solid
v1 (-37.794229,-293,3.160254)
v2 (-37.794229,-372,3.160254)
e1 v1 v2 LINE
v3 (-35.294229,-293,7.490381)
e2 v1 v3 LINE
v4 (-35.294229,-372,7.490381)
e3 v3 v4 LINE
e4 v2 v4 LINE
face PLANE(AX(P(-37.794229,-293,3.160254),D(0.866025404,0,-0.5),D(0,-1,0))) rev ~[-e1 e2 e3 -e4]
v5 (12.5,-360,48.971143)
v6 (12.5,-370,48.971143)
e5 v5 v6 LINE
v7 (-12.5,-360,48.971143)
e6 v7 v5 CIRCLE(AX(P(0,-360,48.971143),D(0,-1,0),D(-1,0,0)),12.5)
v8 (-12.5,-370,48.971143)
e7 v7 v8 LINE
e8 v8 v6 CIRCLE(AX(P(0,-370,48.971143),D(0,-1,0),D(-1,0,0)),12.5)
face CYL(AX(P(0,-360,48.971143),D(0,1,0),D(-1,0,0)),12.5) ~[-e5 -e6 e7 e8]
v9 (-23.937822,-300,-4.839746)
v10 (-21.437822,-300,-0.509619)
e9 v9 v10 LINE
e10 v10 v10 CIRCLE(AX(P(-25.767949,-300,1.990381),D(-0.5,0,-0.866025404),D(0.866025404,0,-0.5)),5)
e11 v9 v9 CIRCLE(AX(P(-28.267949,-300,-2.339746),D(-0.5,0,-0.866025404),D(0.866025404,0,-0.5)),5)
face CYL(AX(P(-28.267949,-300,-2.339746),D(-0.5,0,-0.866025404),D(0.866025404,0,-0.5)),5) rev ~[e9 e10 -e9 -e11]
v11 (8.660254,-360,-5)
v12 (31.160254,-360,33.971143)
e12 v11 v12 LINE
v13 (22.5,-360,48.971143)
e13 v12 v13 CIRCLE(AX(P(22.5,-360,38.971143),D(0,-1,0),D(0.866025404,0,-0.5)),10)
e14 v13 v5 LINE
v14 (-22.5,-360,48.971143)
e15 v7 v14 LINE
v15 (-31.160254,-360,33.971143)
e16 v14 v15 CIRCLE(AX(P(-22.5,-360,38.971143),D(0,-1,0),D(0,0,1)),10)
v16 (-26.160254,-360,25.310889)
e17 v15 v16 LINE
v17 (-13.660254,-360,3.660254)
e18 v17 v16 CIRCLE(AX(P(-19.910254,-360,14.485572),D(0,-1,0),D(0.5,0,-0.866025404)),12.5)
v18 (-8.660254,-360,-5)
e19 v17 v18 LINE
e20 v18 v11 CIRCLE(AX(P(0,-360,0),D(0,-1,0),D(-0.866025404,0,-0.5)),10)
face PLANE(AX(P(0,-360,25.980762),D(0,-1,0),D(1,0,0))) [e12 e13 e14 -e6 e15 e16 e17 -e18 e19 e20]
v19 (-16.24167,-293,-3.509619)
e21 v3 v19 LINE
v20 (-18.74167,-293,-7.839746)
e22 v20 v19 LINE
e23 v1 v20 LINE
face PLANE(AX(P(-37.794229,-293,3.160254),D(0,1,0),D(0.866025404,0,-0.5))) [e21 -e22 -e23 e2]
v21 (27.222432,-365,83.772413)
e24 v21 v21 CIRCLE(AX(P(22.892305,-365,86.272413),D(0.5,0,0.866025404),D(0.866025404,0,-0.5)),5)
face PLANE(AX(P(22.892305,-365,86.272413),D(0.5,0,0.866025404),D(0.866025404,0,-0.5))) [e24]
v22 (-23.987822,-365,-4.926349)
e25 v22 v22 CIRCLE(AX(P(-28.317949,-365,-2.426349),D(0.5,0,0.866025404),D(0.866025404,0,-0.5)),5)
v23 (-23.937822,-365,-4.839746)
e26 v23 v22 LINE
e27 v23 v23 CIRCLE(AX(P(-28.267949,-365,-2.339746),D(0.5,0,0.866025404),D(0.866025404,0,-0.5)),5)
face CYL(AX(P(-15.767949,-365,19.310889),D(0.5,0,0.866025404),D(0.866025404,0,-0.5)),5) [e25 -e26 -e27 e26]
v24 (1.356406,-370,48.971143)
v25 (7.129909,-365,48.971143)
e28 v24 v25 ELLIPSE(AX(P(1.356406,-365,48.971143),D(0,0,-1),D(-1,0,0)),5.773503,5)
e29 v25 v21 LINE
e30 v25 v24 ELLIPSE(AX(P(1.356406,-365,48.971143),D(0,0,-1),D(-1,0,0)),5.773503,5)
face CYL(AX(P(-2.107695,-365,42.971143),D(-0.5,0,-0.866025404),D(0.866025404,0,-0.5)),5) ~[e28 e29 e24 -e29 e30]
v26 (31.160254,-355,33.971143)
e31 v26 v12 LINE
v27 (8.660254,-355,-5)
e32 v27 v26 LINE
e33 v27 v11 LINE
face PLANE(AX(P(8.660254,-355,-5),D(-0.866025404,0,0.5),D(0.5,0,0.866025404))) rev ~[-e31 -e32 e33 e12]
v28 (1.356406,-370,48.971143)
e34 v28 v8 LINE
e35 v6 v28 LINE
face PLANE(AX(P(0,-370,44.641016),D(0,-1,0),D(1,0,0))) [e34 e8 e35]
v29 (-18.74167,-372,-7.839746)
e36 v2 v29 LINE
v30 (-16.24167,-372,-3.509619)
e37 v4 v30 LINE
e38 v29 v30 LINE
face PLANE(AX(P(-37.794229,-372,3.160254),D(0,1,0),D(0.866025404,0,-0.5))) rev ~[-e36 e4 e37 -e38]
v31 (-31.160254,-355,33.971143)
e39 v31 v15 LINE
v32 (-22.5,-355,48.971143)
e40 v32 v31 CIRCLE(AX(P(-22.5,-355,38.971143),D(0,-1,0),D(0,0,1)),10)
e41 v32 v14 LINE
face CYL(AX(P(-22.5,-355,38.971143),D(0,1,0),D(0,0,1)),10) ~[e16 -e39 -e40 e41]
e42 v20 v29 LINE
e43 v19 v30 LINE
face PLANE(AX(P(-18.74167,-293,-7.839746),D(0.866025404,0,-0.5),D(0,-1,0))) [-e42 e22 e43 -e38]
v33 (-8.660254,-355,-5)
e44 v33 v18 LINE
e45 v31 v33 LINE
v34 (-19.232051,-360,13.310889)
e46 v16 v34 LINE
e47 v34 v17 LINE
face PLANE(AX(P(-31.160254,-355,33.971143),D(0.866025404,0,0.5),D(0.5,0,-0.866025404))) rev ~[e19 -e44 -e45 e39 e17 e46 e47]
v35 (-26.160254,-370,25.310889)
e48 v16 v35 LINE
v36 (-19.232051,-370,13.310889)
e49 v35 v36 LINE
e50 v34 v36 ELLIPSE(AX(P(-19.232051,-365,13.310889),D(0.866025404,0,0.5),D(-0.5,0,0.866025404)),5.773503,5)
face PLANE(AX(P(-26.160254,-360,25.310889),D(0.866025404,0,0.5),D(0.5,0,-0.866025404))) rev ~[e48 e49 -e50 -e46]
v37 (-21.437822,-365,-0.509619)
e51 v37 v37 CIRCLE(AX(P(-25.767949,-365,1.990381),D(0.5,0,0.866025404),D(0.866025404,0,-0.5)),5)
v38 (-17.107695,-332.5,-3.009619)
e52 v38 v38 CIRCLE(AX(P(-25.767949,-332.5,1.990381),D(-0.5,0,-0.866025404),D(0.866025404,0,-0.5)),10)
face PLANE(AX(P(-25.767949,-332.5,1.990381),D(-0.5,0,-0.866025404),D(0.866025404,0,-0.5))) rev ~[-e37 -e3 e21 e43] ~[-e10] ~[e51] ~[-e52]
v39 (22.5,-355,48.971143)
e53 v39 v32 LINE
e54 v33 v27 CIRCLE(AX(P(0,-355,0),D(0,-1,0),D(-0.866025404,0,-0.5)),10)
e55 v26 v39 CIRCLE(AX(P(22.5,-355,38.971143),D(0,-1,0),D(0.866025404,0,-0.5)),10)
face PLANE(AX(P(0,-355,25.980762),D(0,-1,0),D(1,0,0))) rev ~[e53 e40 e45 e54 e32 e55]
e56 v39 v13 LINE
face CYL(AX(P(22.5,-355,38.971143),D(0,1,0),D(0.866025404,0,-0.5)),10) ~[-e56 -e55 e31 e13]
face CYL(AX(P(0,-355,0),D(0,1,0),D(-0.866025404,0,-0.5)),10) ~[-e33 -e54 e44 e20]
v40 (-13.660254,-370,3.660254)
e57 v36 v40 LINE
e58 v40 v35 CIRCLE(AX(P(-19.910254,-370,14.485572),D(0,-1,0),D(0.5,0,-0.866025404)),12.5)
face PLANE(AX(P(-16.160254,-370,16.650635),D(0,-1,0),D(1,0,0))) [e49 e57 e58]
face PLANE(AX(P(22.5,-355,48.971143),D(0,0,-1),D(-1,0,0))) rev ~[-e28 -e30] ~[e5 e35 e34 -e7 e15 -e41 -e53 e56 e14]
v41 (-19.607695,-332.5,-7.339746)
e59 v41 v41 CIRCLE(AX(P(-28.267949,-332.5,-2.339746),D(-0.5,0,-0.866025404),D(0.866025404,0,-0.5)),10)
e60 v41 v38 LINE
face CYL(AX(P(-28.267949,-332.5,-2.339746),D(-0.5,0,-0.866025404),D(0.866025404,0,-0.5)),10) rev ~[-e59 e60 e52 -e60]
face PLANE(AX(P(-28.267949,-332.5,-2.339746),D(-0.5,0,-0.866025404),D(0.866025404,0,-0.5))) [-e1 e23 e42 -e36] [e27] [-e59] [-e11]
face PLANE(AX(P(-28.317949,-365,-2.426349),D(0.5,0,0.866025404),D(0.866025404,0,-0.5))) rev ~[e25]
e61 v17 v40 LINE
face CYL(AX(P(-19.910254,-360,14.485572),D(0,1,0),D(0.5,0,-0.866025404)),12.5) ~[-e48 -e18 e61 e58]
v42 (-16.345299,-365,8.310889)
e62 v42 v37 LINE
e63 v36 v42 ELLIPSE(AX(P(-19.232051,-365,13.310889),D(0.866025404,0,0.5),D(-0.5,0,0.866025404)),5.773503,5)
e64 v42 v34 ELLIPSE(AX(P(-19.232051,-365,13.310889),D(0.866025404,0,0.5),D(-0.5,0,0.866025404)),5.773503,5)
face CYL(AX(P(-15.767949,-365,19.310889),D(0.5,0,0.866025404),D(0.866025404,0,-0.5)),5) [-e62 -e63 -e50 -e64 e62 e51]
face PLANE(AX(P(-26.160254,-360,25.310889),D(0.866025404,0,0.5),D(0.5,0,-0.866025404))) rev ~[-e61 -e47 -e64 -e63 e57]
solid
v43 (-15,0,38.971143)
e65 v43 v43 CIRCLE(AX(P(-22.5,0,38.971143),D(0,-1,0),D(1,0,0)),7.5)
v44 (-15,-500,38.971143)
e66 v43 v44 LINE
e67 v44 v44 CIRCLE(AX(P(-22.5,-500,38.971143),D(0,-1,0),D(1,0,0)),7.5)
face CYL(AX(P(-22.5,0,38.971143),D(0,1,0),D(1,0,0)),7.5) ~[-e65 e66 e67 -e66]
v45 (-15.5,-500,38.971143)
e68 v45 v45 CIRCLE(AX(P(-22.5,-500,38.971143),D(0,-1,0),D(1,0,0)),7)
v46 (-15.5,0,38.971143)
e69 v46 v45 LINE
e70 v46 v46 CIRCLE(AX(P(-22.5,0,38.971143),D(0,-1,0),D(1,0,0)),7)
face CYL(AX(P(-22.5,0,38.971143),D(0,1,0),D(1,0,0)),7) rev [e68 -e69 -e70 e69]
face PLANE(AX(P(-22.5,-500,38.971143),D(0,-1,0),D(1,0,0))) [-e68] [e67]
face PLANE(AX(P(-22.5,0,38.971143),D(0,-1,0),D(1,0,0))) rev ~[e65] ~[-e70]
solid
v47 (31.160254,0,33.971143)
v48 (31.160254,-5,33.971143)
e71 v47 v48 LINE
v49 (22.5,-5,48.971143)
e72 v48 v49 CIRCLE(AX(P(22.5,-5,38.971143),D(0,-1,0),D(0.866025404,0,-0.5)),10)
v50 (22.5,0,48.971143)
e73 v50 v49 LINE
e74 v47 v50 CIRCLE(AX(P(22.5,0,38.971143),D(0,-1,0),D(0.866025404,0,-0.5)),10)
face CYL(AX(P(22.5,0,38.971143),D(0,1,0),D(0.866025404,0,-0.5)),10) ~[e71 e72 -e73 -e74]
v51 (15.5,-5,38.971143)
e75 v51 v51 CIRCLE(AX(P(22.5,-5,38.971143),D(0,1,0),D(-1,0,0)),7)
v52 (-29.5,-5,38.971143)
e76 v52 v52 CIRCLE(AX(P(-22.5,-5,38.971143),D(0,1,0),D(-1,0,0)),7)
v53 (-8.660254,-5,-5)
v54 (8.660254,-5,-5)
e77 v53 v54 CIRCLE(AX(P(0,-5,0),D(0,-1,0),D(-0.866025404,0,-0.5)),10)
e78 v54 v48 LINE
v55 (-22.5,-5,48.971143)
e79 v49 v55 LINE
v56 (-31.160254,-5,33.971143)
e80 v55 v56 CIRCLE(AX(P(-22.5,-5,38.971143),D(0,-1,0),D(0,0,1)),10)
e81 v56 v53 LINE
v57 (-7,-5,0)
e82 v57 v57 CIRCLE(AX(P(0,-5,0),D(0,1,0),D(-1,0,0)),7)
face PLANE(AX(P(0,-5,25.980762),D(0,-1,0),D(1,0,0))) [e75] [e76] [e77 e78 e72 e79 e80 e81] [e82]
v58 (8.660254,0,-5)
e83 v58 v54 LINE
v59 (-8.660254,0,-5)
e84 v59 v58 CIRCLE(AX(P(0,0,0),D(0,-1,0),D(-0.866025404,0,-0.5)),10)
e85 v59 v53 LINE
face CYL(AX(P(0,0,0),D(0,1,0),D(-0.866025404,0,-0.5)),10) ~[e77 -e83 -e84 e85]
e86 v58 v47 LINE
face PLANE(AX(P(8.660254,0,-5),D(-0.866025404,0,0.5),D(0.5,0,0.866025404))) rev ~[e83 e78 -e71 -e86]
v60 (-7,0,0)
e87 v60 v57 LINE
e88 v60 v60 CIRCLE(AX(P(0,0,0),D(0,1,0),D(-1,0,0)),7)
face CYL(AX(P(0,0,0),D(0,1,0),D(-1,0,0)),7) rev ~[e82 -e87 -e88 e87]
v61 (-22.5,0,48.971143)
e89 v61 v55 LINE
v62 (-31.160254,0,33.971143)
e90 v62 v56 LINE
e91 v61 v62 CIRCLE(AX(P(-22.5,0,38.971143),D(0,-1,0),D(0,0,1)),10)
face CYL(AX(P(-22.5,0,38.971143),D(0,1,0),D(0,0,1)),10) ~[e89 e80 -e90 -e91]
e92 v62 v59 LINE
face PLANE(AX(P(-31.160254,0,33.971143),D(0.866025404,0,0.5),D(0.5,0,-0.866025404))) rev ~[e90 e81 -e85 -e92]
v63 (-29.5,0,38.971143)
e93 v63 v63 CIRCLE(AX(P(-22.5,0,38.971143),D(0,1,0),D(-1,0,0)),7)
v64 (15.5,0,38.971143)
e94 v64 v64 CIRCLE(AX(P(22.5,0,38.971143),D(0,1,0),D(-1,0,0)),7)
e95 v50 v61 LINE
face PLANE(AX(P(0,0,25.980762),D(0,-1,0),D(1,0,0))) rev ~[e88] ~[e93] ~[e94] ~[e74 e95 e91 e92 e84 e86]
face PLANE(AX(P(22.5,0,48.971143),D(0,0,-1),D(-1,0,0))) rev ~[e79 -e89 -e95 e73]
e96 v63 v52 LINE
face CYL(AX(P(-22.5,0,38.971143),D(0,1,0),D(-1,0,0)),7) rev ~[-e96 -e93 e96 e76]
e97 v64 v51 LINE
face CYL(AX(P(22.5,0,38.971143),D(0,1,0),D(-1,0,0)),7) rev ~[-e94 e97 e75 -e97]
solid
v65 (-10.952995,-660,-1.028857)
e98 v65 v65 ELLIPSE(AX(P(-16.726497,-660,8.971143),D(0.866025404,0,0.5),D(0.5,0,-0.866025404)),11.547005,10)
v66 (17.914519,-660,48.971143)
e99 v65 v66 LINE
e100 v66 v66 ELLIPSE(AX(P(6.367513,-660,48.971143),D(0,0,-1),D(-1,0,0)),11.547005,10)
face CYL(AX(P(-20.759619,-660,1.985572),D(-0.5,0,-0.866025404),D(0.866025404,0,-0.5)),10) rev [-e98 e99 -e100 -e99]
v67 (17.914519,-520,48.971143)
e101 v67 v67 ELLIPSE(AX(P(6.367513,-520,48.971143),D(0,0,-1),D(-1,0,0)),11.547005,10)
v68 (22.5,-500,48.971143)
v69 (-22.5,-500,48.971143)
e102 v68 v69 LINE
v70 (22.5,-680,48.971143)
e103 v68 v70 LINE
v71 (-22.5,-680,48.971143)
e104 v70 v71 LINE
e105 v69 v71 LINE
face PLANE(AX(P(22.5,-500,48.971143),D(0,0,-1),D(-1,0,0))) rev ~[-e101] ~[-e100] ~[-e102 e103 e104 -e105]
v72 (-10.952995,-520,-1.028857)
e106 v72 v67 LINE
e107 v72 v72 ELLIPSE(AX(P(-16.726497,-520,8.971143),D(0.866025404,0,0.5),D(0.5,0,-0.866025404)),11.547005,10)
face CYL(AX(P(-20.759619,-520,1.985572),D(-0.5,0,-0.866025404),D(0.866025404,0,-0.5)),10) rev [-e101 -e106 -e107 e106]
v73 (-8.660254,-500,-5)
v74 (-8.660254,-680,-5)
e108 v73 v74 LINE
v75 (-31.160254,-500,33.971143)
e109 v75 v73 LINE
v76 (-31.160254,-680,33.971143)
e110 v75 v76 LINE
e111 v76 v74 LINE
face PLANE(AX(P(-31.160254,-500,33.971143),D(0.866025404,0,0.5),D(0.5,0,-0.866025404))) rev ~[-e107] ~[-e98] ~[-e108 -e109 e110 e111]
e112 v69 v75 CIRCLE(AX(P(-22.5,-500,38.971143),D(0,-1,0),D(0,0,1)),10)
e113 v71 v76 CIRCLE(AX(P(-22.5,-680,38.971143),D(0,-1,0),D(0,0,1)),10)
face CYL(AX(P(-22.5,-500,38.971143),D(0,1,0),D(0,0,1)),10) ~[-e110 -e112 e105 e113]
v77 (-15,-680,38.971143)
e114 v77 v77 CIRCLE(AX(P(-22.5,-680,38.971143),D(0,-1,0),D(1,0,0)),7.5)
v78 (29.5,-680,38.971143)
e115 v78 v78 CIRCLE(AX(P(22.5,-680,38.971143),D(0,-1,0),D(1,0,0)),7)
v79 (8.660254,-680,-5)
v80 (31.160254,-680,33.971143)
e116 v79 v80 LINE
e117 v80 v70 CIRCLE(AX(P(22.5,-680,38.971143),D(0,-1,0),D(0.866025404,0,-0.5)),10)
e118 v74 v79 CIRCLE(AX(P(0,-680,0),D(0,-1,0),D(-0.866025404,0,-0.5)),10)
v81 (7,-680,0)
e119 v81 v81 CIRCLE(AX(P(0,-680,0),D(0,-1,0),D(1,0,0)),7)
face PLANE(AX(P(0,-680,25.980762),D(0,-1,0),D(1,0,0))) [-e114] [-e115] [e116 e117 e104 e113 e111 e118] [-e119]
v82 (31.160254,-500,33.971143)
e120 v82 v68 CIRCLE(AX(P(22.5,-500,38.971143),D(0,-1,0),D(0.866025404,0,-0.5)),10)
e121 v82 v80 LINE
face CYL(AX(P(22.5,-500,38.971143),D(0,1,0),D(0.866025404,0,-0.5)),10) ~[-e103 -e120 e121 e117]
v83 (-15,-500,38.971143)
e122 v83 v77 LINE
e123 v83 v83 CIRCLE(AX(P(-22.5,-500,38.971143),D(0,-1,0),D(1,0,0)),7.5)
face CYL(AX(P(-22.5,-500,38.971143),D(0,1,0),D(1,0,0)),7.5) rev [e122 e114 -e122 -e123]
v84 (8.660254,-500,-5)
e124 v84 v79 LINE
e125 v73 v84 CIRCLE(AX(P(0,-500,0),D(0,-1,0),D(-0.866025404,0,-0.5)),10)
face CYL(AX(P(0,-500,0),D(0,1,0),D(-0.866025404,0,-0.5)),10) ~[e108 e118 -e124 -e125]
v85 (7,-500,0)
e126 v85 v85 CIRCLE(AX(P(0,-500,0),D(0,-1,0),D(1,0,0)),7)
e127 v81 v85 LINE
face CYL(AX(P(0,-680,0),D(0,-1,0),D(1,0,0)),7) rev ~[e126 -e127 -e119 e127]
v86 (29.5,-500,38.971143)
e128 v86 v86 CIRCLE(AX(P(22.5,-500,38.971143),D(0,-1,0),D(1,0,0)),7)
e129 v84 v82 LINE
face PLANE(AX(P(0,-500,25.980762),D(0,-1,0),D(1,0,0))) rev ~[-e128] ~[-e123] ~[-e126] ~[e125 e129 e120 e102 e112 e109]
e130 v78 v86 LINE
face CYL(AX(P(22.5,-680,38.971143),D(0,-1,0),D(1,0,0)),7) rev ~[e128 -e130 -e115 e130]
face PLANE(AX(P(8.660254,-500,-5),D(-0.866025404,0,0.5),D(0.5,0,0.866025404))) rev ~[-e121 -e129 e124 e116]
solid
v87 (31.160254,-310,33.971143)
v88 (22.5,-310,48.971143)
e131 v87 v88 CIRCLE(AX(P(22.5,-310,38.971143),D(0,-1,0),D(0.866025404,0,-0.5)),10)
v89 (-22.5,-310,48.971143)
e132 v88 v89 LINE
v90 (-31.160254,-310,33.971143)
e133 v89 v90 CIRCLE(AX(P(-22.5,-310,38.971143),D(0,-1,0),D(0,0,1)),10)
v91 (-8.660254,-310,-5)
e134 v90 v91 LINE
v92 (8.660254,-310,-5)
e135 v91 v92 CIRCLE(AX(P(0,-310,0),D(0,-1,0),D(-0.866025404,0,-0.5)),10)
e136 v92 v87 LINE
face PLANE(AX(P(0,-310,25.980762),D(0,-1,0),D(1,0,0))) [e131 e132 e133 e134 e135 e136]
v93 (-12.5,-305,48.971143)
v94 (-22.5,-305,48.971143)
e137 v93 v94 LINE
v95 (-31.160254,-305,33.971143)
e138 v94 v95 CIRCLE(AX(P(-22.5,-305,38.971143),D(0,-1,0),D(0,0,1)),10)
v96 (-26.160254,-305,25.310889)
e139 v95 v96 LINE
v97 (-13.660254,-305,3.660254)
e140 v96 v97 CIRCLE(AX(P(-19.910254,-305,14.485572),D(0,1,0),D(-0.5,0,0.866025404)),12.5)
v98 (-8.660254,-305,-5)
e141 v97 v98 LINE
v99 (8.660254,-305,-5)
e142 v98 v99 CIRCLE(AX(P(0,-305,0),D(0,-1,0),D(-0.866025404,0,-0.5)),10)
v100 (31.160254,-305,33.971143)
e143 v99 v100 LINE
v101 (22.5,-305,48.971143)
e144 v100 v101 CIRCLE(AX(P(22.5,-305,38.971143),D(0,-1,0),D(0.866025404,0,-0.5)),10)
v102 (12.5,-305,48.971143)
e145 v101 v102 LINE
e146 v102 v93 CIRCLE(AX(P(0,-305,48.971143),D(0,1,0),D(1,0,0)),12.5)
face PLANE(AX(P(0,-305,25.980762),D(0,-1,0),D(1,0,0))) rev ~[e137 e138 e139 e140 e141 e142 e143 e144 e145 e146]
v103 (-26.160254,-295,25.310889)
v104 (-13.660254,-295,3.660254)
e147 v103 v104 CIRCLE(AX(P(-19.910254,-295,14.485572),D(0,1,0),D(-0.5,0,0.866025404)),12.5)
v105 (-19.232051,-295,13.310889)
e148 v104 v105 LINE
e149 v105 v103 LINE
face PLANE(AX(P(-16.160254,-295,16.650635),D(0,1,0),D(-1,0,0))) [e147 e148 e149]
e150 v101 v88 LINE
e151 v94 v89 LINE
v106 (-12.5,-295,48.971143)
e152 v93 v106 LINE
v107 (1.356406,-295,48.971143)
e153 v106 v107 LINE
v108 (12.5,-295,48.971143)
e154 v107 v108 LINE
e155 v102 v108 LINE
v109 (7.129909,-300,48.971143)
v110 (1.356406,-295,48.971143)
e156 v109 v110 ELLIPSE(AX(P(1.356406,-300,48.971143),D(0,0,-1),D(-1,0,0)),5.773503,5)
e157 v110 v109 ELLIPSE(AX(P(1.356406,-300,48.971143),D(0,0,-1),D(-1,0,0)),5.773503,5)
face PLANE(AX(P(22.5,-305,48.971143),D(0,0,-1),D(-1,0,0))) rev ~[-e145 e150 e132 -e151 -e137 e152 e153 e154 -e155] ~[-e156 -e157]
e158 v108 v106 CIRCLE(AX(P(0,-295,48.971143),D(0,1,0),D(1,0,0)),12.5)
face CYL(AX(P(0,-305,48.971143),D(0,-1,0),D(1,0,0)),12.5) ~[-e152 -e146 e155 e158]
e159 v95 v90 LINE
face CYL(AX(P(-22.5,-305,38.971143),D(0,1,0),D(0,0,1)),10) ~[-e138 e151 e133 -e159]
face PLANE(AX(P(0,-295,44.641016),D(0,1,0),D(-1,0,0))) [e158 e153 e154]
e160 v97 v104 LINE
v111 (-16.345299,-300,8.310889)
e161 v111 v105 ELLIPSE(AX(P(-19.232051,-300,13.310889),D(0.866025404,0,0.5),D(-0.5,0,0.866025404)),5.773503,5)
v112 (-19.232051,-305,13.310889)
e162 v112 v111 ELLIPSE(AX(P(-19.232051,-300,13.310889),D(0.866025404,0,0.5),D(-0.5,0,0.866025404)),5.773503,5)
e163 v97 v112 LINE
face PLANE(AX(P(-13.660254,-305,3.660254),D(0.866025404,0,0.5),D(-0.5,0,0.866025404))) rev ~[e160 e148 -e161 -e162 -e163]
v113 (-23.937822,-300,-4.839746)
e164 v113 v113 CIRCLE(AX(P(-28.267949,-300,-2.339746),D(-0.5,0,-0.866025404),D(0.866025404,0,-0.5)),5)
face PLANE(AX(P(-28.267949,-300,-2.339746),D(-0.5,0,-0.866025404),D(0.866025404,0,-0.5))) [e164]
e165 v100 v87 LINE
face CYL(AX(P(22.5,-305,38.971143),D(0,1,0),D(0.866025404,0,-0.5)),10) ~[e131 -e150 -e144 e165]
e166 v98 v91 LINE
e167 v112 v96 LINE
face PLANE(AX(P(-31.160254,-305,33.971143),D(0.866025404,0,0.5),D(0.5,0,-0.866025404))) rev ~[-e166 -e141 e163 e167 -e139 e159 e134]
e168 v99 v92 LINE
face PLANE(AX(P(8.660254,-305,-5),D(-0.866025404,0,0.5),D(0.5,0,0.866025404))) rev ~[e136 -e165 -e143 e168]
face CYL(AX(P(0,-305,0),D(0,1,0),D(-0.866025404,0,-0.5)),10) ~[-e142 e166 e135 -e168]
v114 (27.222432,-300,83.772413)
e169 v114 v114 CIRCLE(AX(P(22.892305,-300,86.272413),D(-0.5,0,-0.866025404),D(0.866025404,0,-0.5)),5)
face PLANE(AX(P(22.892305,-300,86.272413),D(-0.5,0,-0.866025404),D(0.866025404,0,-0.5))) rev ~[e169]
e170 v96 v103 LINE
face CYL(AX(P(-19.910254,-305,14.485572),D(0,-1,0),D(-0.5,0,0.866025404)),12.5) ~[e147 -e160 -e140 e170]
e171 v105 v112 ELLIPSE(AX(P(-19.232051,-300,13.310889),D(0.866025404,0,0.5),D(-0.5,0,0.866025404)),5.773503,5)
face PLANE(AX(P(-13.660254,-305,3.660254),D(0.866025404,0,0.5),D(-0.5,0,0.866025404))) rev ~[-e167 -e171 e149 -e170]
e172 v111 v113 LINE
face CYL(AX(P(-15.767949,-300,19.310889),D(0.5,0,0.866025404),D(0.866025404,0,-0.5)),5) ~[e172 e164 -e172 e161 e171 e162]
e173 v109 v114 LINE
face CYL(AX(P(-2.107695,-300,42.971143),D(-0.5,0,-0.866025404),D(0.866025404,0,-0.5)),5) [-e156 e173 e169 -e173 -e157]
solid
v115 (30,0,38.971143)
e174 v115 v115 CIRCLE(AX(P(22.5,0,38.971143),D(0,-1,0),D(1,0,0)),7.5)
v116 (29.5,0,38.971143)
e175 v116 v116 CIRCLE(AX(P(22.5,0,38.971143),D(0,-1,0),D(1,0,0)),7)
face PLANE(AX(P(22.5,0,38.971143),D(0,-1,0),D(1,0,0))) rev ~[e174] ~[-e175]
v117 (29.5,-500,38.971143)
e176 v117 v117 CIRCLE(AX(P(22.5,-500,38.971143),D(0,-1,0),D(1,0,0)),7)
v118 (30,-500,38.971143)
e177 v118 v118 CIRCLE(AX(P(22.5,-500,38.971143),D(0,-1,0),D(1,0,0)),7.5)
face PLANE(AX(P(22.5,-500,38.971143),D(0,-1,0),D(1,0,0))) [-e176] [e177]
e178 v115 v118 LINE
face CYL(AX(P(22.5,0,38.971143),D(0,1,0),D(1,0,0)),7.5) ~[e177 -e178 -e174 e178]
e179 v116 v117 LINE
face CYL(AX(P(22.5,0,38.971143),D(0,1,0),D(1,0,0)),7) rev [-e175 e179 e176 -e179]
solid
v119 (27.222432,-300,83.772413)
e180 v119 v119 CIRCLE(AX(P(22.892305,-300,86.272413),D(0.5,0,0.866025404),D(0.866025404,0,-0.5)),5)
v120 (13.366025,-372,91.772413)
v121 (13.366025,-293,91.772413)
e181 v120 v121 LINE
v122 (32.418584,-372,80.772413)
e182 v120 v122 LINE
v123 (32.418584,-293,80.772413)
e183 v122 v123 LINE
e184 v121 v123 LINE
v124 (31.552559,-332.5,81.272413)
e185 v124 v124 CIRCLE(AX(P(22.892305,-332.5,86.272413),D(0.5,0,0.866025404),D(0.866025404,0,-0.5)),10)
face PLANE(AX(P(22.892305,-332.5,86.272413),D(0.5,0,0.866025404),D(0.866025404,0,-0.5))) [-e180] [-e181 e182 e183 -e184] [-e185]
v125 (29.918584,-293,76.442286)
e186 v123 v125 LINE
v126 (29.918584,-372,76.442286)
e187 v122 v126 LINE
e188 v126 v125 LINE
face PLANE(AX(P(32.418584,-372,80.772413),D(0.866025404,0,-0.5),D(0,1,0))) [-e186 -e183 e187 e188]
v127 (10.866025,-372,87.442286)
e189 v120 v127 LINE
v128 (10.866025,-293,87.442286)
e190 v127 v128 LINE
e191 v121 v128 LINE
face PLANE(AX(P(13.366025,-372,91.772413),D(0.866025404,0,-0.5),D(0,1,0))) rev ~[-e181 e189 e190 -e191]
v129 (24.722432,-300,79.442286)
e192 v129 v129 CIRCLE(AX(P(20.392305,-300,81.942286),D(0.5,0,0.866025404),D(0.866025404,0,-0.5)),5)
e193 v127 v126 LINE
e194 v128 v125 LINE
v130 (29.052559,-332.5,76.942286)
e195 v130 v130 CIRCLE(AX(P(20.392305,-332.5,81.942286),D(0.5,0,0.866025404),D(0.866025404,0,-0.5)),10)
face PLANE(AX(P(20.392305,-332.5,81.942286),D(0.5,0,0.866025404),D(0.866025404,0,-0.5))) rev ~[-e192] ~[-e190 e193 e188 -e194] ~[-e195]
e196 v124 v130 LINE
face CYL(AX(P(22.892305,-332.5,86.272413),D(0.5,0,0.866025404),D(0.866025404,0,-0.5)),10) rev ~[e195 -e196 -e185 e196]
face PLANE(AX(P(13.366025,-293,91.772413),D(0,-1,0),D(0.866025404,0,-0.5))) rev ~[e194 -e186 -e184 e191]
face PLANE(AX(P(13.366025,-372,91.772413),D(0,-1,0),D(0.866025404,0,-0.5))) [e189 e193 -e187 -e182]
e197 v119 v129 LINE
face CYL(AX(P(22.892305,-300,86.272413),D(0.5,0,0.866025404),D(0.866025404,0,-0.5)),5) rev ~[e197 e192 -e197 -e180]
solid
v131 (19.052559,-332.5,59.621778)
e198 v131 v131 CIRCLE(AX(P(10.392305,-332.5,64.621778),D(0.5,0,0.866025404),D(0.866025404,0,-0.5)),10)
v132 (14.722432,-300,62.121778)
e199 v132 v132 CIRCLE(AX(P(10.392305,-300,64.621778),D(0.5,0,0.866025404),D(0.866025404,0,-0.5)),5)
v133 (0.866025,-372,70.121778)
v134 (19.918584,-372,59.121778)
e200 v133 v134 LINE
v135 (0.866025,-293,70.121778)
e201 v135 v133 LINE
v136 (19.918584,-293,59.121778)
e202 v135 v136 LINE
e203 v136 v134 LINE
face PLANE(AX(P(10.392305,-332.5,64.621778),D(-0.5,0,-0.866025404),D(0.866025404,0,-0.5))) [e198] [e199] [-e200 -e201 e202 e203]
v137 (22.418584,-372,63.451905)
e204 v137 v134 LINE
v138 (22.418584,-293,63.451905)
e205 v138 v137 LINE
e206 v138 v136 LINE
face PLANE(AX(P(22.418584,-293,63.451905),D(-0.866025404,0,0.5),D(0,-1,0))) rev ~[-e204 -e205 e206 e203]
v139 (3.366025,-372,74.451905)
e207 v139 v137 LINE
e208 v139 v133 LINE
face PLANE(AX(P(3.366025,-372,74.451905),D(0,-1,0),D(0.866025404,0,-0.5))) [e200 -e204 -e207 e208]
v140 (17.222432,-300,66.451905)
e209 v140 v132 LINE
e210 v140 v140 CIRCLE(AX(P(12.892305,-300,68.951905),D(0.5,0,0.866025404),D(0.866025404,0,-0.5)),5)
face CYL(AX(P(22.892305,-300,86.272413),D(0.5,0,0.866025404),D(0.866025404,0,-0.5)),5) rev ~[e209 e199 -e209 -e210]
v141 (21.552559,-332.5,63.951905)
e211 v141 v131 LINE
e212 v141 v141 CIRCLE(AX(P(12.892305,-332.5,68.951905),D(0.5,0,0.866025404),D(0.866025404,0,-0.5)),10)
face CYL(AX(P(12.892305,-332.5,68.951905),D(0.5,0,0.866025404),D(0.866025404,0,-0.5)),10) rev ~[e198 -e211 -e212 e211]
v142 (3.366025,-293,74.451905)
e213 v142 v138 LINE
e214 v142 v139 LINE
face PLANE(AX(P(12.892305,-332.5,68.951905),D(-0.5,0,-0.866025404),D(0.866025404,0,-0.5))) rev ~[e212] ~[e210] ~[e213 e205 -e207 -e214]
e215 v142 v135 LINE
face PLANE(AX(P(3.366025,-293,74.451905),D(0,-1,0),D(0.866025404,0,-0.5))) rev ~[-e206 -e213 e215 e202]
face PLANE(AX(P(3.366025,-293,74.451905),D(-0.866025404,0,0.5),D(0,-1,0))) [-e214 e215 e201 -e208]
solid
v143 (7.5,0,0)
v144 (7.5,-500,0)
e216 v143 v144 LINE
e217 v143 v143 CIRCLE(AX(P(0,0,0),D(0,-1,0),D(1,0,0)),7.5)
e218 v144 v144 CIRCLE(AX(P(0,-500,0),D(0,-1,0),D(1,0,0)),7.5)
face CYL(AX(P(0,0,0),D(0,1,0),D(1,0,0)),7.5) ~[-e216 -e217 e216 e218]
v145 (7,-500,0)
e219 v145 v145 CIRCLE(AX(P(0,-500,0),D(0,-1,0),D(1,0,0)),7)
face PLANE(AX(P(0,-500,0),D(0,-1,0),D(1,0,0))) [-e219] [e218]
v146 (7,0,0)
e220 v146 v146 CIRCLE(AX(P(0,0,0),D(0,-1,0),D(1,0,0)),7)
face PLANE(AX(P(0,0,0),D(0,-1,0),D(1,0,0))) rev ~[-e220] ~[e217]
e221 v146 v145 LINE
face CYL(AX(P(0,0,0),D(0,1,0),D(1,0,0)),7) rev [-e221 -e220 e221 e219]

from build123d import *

# Parameters (mm, degrees)
F0_R      = 7.5
F0_R_2    = 7
F1_DEPTH  = 500
F3_DEPTH  = 5
F4_R      = 7.5
F5_DEPTH  = 180
F8_R      = 7
F9_DEPTH  = 25
F11_R     = 7
F12_DEPTH = 195.3
F15_DEPTH = 5
F18_DEPTH = 5
F20_DEPTH = 10
F22_DEPTH = 10
F24_R     = 5
F25_DEPTH = 50
F27_R     = 5
F28_DEPTH = 50
F29_W     = 22
F29_H     = 79
F30_DEPTH = 5
F31_R     = 10
F32_DEPTH = 28.9
F34_W     = 22
F34_H     = 79
F35_DEPTH = 5
F36_R     = 10
F37_DEPTH = 14.6
F39_DEPTH = 10
F41_DEPTH = 10
F44_R     = 5
F45_DEPTH = 25
F46_R     = 5
F47_DEPTH = 25.1
F48_W     = 22
F48_H     = 79
F48_R     = 5
F49_DEPTH = 5
F50_R     = 10
F51_DEPTH = 25
F52_R     = 5
F53_DEPTH = 25
F7_R      = 10
F56_DEPTH = 101


# Not quite as in the source:
# - a feature of the source that left no trace in its solid (it failed there, or was rolled back) is left out


with BuildPart() as f1:
    # F0 (on Front) → F1 (new body)
    with BuildSketch(Plane.XZ):
        with Locations((-22.5, 38.9711431703)):
            Circle(F0_R)
        with Locations((-22.5, 38.9711431703)):
            Circle(F0_R_2, mode=Mode.SUBTRACT)
    extrude(amount=F1_DEPTH)


with BuildPart() as f1b:
    # F0 (on Front) → F1, piece 2 (new body)
    with BuildSketch(Plane.XZ):
        with Locations((22.5, 38.9711431703)):
            Circle(F0_R)
        with Locations((22.5, 38.9711431703)):
            Circle(F0_R_2, mode=Mode.SUBTRACT)
    extrude(amount=F1_DEPTH)


with BuildPart() as f1c:
    # F0 (on Front) → F1, piece 3 (new body)
    with BuildSketch(Plane.XZ):
        Circle(F0_R)
        Circle(F0_R_2, mode=Mode.SUBTRACT)
    extrude(amount=F1_DEPTH)


with BuildPart() as f3:
    # F2 (on Front) → F3 (new body)
    with BuildSketch(Plane.XZ):
        with BuildLine():
            ThreePointArc((31.1602540378, 33.9711431703), (31.1602540378, 43.9711431703), (22.5, 48.9711431703))
            Line((22.5, 48.9711431703), (-22.5, 48.9711431703))
            ThreePointArc((-22.5, 48.9711431703), (-31.1602540378, 43.9711431703), (-31.1602540378, 33.9711431703))
            Line((-31.1602540378, 33.9711431703), (-8.6602540378, -5))
            ThreePointArc((-8.6602540378, -5), (0, -10), (8.6602540378, -5))
            Line((8.6602540378, -5), (31.1602540378, 33.9711431703))
        make_face()
    extrude(amount=F3_DEPTH)

    # F8 (on face) → F9 (cut)
    with BuildSketch(Plane(origin=(0, 0, 0), x_dir=(-1, 0, 0), z_dir=(0, 1, 0))):
        with Locations((-22.5, 38.9711431703)):
            Circle(F8_R)
        with Locations((22.5, 38.9711431703)):
            Circle(F8_R)
        Circle(F8_R)
    extrude(amount=-F9_DEPTH, mode=Mode.SUBTRACT)


with BuildPart() as f5:
    # F4 (on face) → F5 (new body)
    with BuildSketch(Plane.XZ.offset(500)):
        with BuildLine():
            Line((22.5, 48.9711431703), (-22.5, 48.9711431703))
            ThreePointArc((-22.5, 48.9711431703), (-31.1602540378, 43.9711431703), (-31.1602540378, 33.9711431703))
            Line((-31.1602540378, 33.9711431703), (-8.6602540378, -5))
            ThreePointArc((-8.6602540378, -5), (0, -10), (8.6602540378, -5))
            Line((8.6602540378, -5), (31.1602540378, 33.9711431703))
            ThreePointArc((31.1602540378, 33.9711431703), (31.1602540378, 43.9711431703), (22.5, 48.9711431703))
        make_face()
        with Locations((-22.5, 38.9711431703)):
            Circle(F4_R, mode=Mode.SUBTRACT)
    extrude(amount=F5_DEPTH)

    # F11 (on face) → F12 (cut)
    with BuildSketch(Plane.XZ.offset(680)):
        with Locations((22.5, 38.9711431703)):
            Circle(F11_R)
        Circle(F11_R)
        with Locations((-22.5, 38.9711431703)):
            Circle(F11_R)
    extrude(amount=-F12_DEPTH, mode=Mode.SUBTRACT)

    # F7 (on face) → F56 (cut)
    with BuildSketch(Plane(origin=(-4.3301270189, 0, -7.5), x_dir=(0.8660254038, 0, -0.5), z_dir=(0.5, 0, 0.8660254038))):
        with Locations((-18.9711431703, -660)):
            Circle(F7_R)
        with Locations((-18.9711431703, -520)):
            Circle(F7_R)
    extrude(amount=F56_DEPTH, mode=Mode.SUBTRACT)


with BuildPart() as f15:
    # F14 (on offset) → F15 (new body)
    with BuildSketch(Plane.XZ.offset(305)):
        with BuildLine():
            ThreePointArc((31.1602540378, 33.9711431703), (31.1602540378, 43.9711431703), (22.5, 48.9711431703))
            Line((22.5, 48.9711431703), (-22.5, 48.9711431703))
            ThreePointArc((-22.5, 48.9711431703), (-31.1602540378, 43.9711431703), (-31.1602540378, 33.9711431703))
            Line((-31.1602540378, 33.9711431703), (-8.6602540378, -5))
            ThreePointArc((-8.6602540378, -5), (0, -10), (8.6602540378, -5))
            Line((8.6602540378, -5), (31.1602540378, 33.9711431703))
        make_face()
    extrude(amount=F15_DEPTH)

    # F19 (on face) → F20 (join)
    with BuildSketch(Plane(origin=(0, -305, 0), x_dir=(-1, 0, 0), z_dir=(0, 1, 0))):
        with BuildLine():
            ThreePointArc((-12.5, 48.9711431703), (0, 36.4711431703), (12.5, 48.9711431703))
            Line((12.5, 48.9711431703), (-12.5, 48.9711431703))
        make_face()
    extrude(amount=F20_DEPTH)

    # F24 (on face) → F25 (join)
    with BuildSketch(Plane(origin=(18.0801270189, 0, 31.3156986041), x_dir=(0.8660254038, 0, -0.5), z_dir=(-0.5, 0, -0.8660254038))):
        with Locations((-23.3108891325, 300)):
            Circle(F24_R)
    extrude(amount=-F25_DEPTH)

    # F38 (on face) → F39 (join)
    with BuildSketch(Plane(origin=(0, -305, 0), x_dir=(-1, 0, 0), z_dir=(0, 1, 0))):
        with BuildLine():
            Line((13.6602540378, 3.6602540378), (26.1602540378, 25.3108891325))
            ThreePointArc((26.1602540378, 25.3108891325), (9.0849364905, 20.7355715851), (13.6602540378, 3.6602540378))
        make_face()
    extrude(amount=F39_DEPTH)

    # F44 (on face) → F45 (join)
    with BuildSketch(Plane(origin=(4.4198729811, 0, 7.6554445662), x_dir=(0.8660254038, 0, -0.5), z_dir=(-0.5, 0, -0.8660254038))):
        with Locations((-23.3108891325, 300)):
            Circle(F44_R)
    extrude(amount=F45_DEPTH)


with BuildPart() as f18:
    # F17 (on offset) → F18 (new body)
    with BuildSketch(Plane.XZ.offset(355)):
        with BuildLine():
            ThreePointArc((31.1602540378, 33.9711431703), (31.1602540378, 43.9711431703), (22.5, 48.9711431703))
            Line((22.5, 48.9711431703), (-22.5, 48.9711431703))
            ThreePointArc((-22.5, 48.9711431703), (-31.1602540378, 43.9711431703), (-31.1602540378, 33.9711431703))
            Line((-31.1602540378, 33.9711431703), (-8.6602540378, -5))
            ThreePointArc((-8.6602540378, -5), (0, -10), (8.6602540378, -5))
            Line((8.6602540378, -5), (31.1602540378, 33.9711431703))
        make_face()
    extrude(amount=F18_DEPTH)

    # F21 (on face) → F22 (join)
    with BuildSketch(Plane.XZ.offset(360)):
        with BuildLine():
            Line((12.5, 48.9711431703), (-12.5, 48.9711431703))
            ThreePointArc((-12.5, 48.9711431703), (0, 36.4711431703), (12.5, 48.9711431703))
        make_face()
    extrude(amount=F22_DEPTH)

    # F27 (on face) → F28 (join)
    with BuildSketch(Plane(origin=(18.0801270189, 0, 31.3156986041), x_dir=(0.8660254038, 0, -0.5), z_dir=(0.5, 0, 0.8660254038))):
        with Locations((-23.3108891325, -365)):
            Circle(F27_R)
    extrude(amount=F28_DEPTH)

    # F40 (on face) → F41 (join)
    with BuildSketch(Plane.XZ.offset(360)):
        with BuildLine():
            ThreePointArc((-13.6602540378, 3.6602540378), (-9.0849364905, 20.7355715851), (-26.1602540378, 25.3108891325))
            Line((-26.1602540378, 25.3108891325), (-13.6602540378, 3.6602540378))
        make_face()
    extrude(amount=F41_DEPTH)

    # F46 (on face) → F47 (join)
    with BuildSketch(Plane(origin=(4.4198729811, 0, 7.6554445662), x_dir=(0.8660254038, 0, -0.5), z_dir=(0.5, 0, 0.8660254038))):
        with Locations((-23.3108891325, -365)):
            Circle(F46_R)
    extrude(amount=-F47_DEPTH)

    # F48 (on face) → F49 (join)
    with BuildSketch(Plane(origin=(-8.0801270189, 0, -13.9951905284), x_dir=(0.8660254038, 0, -0.5), z_dir=(-0.5, 0, -0.8660254038))):
        with Locations((-23.3108891325, 332.5)):
            Rectangle(F48_W, F48_H)
        with Locations((-23.3108891325, 300)):
            Circle(F48_R, mode=Mode.SUBTRACT)
    extrude(amount=-F49_DEPTH)

    # F50 (on face) → F51 (cut)
    with BuildSketch(Plane(origin=(-8.0801270189, 0, -13.9951905284), x_dir=(0.8660254038, 0, -0.5), z_dir=(-0.5, 0, -0.8660254038))):
        with Locations((-23.3108891325, 332.5)):
            Circle(F50_R)
    extrude(amount=-F51_DEPTH, mode=Mode.SUBTRACT)


with BuildPart() as f30:
    # F29 (on face) → F30 (new body)
    with BuildSketch(Plane(origin=(43.0801270189, 0, 74.6169687933), x_dir=(0.8660254038, 0, -0.5), z_dir=(0.5, 0, 0.8660254038))):
        with Locations((-23.3108891325, -332.5)):
            Rectangle(F29_W, F29_H)
    extrude(amount=-F30_DEPTH)

    # F31 (on face) → F32 (cut)
    with BuildSketch(Plane(origin=(43.0801270189, 0, 74.6169687933), x_dir=(0.8660254038, 0, -0.5), z_dir=(0.5, 0, 0.8660254038))):
        with Locations((-23.3108891325, -332.5)):
            Circle(F31_R)
    extrude(amount=-F32_DEPTH, mode=Mode.SUBTRACT)


with BuildPart() as f35:
    # F34 (on offset) → F35 (new body)
    with BuildSketch(Plane(origin=(33.0801270189, 0, 57.2964607176), x_dir=(0.8660254038, 0, -0.5), z_dir=(-0.5, 0, -0.8660254038))):
        with Locations((-23.3108891325, 332.5)):
            Rectangle(F34_W, F34_H)
    extrude(amount=F35_DEPTH)

    # F36 (on face) → F37 (cut)
    with BuildSketch(Plane(origin=(33.0801270189, 0, 57.2964607176), x_dir=(0.8660254038, 0, -0.5), z_dir=(0.5, 0, 0.8660254038))):
        with Locations((-23.3108891325, -332.5)):
            Circle(F36_R)
    extrude(amount=-F37_DEPTH, mode=Mode.SUBTRACT)


with BuildPart() as f53_tool:
    # F52 (on face) → F53 (new body)
    with BuildSketch(Plane(origin=(43.0801270189, 0, 74.6169687933), x_dir=(0.8660254038, 0, -0.5), z_dir=(0.5, 0, 0.8660254038))):
        with Locations((-23.3108891325, -300)):
            Circle(F52_R)
    extrude(amount=-F53_DEPTH)


with BuildPart() as f30_1:
    add(f30.part)

    # F53: cut by f53_tool
    add(f53_tool.part, mode=Mode.SUBTRACT)


with BuildPart() as f35_1:
    add(f35.part)

    # F53: cut by f53_tool
    add(f53_tool.part, mode=Mode.SUBTRACT)


solid = Compound([f1.part, f1b.part, f1c.part, f3.part, f5.part, f15.part, f18.part, f30_1.part, f35_1.part])
